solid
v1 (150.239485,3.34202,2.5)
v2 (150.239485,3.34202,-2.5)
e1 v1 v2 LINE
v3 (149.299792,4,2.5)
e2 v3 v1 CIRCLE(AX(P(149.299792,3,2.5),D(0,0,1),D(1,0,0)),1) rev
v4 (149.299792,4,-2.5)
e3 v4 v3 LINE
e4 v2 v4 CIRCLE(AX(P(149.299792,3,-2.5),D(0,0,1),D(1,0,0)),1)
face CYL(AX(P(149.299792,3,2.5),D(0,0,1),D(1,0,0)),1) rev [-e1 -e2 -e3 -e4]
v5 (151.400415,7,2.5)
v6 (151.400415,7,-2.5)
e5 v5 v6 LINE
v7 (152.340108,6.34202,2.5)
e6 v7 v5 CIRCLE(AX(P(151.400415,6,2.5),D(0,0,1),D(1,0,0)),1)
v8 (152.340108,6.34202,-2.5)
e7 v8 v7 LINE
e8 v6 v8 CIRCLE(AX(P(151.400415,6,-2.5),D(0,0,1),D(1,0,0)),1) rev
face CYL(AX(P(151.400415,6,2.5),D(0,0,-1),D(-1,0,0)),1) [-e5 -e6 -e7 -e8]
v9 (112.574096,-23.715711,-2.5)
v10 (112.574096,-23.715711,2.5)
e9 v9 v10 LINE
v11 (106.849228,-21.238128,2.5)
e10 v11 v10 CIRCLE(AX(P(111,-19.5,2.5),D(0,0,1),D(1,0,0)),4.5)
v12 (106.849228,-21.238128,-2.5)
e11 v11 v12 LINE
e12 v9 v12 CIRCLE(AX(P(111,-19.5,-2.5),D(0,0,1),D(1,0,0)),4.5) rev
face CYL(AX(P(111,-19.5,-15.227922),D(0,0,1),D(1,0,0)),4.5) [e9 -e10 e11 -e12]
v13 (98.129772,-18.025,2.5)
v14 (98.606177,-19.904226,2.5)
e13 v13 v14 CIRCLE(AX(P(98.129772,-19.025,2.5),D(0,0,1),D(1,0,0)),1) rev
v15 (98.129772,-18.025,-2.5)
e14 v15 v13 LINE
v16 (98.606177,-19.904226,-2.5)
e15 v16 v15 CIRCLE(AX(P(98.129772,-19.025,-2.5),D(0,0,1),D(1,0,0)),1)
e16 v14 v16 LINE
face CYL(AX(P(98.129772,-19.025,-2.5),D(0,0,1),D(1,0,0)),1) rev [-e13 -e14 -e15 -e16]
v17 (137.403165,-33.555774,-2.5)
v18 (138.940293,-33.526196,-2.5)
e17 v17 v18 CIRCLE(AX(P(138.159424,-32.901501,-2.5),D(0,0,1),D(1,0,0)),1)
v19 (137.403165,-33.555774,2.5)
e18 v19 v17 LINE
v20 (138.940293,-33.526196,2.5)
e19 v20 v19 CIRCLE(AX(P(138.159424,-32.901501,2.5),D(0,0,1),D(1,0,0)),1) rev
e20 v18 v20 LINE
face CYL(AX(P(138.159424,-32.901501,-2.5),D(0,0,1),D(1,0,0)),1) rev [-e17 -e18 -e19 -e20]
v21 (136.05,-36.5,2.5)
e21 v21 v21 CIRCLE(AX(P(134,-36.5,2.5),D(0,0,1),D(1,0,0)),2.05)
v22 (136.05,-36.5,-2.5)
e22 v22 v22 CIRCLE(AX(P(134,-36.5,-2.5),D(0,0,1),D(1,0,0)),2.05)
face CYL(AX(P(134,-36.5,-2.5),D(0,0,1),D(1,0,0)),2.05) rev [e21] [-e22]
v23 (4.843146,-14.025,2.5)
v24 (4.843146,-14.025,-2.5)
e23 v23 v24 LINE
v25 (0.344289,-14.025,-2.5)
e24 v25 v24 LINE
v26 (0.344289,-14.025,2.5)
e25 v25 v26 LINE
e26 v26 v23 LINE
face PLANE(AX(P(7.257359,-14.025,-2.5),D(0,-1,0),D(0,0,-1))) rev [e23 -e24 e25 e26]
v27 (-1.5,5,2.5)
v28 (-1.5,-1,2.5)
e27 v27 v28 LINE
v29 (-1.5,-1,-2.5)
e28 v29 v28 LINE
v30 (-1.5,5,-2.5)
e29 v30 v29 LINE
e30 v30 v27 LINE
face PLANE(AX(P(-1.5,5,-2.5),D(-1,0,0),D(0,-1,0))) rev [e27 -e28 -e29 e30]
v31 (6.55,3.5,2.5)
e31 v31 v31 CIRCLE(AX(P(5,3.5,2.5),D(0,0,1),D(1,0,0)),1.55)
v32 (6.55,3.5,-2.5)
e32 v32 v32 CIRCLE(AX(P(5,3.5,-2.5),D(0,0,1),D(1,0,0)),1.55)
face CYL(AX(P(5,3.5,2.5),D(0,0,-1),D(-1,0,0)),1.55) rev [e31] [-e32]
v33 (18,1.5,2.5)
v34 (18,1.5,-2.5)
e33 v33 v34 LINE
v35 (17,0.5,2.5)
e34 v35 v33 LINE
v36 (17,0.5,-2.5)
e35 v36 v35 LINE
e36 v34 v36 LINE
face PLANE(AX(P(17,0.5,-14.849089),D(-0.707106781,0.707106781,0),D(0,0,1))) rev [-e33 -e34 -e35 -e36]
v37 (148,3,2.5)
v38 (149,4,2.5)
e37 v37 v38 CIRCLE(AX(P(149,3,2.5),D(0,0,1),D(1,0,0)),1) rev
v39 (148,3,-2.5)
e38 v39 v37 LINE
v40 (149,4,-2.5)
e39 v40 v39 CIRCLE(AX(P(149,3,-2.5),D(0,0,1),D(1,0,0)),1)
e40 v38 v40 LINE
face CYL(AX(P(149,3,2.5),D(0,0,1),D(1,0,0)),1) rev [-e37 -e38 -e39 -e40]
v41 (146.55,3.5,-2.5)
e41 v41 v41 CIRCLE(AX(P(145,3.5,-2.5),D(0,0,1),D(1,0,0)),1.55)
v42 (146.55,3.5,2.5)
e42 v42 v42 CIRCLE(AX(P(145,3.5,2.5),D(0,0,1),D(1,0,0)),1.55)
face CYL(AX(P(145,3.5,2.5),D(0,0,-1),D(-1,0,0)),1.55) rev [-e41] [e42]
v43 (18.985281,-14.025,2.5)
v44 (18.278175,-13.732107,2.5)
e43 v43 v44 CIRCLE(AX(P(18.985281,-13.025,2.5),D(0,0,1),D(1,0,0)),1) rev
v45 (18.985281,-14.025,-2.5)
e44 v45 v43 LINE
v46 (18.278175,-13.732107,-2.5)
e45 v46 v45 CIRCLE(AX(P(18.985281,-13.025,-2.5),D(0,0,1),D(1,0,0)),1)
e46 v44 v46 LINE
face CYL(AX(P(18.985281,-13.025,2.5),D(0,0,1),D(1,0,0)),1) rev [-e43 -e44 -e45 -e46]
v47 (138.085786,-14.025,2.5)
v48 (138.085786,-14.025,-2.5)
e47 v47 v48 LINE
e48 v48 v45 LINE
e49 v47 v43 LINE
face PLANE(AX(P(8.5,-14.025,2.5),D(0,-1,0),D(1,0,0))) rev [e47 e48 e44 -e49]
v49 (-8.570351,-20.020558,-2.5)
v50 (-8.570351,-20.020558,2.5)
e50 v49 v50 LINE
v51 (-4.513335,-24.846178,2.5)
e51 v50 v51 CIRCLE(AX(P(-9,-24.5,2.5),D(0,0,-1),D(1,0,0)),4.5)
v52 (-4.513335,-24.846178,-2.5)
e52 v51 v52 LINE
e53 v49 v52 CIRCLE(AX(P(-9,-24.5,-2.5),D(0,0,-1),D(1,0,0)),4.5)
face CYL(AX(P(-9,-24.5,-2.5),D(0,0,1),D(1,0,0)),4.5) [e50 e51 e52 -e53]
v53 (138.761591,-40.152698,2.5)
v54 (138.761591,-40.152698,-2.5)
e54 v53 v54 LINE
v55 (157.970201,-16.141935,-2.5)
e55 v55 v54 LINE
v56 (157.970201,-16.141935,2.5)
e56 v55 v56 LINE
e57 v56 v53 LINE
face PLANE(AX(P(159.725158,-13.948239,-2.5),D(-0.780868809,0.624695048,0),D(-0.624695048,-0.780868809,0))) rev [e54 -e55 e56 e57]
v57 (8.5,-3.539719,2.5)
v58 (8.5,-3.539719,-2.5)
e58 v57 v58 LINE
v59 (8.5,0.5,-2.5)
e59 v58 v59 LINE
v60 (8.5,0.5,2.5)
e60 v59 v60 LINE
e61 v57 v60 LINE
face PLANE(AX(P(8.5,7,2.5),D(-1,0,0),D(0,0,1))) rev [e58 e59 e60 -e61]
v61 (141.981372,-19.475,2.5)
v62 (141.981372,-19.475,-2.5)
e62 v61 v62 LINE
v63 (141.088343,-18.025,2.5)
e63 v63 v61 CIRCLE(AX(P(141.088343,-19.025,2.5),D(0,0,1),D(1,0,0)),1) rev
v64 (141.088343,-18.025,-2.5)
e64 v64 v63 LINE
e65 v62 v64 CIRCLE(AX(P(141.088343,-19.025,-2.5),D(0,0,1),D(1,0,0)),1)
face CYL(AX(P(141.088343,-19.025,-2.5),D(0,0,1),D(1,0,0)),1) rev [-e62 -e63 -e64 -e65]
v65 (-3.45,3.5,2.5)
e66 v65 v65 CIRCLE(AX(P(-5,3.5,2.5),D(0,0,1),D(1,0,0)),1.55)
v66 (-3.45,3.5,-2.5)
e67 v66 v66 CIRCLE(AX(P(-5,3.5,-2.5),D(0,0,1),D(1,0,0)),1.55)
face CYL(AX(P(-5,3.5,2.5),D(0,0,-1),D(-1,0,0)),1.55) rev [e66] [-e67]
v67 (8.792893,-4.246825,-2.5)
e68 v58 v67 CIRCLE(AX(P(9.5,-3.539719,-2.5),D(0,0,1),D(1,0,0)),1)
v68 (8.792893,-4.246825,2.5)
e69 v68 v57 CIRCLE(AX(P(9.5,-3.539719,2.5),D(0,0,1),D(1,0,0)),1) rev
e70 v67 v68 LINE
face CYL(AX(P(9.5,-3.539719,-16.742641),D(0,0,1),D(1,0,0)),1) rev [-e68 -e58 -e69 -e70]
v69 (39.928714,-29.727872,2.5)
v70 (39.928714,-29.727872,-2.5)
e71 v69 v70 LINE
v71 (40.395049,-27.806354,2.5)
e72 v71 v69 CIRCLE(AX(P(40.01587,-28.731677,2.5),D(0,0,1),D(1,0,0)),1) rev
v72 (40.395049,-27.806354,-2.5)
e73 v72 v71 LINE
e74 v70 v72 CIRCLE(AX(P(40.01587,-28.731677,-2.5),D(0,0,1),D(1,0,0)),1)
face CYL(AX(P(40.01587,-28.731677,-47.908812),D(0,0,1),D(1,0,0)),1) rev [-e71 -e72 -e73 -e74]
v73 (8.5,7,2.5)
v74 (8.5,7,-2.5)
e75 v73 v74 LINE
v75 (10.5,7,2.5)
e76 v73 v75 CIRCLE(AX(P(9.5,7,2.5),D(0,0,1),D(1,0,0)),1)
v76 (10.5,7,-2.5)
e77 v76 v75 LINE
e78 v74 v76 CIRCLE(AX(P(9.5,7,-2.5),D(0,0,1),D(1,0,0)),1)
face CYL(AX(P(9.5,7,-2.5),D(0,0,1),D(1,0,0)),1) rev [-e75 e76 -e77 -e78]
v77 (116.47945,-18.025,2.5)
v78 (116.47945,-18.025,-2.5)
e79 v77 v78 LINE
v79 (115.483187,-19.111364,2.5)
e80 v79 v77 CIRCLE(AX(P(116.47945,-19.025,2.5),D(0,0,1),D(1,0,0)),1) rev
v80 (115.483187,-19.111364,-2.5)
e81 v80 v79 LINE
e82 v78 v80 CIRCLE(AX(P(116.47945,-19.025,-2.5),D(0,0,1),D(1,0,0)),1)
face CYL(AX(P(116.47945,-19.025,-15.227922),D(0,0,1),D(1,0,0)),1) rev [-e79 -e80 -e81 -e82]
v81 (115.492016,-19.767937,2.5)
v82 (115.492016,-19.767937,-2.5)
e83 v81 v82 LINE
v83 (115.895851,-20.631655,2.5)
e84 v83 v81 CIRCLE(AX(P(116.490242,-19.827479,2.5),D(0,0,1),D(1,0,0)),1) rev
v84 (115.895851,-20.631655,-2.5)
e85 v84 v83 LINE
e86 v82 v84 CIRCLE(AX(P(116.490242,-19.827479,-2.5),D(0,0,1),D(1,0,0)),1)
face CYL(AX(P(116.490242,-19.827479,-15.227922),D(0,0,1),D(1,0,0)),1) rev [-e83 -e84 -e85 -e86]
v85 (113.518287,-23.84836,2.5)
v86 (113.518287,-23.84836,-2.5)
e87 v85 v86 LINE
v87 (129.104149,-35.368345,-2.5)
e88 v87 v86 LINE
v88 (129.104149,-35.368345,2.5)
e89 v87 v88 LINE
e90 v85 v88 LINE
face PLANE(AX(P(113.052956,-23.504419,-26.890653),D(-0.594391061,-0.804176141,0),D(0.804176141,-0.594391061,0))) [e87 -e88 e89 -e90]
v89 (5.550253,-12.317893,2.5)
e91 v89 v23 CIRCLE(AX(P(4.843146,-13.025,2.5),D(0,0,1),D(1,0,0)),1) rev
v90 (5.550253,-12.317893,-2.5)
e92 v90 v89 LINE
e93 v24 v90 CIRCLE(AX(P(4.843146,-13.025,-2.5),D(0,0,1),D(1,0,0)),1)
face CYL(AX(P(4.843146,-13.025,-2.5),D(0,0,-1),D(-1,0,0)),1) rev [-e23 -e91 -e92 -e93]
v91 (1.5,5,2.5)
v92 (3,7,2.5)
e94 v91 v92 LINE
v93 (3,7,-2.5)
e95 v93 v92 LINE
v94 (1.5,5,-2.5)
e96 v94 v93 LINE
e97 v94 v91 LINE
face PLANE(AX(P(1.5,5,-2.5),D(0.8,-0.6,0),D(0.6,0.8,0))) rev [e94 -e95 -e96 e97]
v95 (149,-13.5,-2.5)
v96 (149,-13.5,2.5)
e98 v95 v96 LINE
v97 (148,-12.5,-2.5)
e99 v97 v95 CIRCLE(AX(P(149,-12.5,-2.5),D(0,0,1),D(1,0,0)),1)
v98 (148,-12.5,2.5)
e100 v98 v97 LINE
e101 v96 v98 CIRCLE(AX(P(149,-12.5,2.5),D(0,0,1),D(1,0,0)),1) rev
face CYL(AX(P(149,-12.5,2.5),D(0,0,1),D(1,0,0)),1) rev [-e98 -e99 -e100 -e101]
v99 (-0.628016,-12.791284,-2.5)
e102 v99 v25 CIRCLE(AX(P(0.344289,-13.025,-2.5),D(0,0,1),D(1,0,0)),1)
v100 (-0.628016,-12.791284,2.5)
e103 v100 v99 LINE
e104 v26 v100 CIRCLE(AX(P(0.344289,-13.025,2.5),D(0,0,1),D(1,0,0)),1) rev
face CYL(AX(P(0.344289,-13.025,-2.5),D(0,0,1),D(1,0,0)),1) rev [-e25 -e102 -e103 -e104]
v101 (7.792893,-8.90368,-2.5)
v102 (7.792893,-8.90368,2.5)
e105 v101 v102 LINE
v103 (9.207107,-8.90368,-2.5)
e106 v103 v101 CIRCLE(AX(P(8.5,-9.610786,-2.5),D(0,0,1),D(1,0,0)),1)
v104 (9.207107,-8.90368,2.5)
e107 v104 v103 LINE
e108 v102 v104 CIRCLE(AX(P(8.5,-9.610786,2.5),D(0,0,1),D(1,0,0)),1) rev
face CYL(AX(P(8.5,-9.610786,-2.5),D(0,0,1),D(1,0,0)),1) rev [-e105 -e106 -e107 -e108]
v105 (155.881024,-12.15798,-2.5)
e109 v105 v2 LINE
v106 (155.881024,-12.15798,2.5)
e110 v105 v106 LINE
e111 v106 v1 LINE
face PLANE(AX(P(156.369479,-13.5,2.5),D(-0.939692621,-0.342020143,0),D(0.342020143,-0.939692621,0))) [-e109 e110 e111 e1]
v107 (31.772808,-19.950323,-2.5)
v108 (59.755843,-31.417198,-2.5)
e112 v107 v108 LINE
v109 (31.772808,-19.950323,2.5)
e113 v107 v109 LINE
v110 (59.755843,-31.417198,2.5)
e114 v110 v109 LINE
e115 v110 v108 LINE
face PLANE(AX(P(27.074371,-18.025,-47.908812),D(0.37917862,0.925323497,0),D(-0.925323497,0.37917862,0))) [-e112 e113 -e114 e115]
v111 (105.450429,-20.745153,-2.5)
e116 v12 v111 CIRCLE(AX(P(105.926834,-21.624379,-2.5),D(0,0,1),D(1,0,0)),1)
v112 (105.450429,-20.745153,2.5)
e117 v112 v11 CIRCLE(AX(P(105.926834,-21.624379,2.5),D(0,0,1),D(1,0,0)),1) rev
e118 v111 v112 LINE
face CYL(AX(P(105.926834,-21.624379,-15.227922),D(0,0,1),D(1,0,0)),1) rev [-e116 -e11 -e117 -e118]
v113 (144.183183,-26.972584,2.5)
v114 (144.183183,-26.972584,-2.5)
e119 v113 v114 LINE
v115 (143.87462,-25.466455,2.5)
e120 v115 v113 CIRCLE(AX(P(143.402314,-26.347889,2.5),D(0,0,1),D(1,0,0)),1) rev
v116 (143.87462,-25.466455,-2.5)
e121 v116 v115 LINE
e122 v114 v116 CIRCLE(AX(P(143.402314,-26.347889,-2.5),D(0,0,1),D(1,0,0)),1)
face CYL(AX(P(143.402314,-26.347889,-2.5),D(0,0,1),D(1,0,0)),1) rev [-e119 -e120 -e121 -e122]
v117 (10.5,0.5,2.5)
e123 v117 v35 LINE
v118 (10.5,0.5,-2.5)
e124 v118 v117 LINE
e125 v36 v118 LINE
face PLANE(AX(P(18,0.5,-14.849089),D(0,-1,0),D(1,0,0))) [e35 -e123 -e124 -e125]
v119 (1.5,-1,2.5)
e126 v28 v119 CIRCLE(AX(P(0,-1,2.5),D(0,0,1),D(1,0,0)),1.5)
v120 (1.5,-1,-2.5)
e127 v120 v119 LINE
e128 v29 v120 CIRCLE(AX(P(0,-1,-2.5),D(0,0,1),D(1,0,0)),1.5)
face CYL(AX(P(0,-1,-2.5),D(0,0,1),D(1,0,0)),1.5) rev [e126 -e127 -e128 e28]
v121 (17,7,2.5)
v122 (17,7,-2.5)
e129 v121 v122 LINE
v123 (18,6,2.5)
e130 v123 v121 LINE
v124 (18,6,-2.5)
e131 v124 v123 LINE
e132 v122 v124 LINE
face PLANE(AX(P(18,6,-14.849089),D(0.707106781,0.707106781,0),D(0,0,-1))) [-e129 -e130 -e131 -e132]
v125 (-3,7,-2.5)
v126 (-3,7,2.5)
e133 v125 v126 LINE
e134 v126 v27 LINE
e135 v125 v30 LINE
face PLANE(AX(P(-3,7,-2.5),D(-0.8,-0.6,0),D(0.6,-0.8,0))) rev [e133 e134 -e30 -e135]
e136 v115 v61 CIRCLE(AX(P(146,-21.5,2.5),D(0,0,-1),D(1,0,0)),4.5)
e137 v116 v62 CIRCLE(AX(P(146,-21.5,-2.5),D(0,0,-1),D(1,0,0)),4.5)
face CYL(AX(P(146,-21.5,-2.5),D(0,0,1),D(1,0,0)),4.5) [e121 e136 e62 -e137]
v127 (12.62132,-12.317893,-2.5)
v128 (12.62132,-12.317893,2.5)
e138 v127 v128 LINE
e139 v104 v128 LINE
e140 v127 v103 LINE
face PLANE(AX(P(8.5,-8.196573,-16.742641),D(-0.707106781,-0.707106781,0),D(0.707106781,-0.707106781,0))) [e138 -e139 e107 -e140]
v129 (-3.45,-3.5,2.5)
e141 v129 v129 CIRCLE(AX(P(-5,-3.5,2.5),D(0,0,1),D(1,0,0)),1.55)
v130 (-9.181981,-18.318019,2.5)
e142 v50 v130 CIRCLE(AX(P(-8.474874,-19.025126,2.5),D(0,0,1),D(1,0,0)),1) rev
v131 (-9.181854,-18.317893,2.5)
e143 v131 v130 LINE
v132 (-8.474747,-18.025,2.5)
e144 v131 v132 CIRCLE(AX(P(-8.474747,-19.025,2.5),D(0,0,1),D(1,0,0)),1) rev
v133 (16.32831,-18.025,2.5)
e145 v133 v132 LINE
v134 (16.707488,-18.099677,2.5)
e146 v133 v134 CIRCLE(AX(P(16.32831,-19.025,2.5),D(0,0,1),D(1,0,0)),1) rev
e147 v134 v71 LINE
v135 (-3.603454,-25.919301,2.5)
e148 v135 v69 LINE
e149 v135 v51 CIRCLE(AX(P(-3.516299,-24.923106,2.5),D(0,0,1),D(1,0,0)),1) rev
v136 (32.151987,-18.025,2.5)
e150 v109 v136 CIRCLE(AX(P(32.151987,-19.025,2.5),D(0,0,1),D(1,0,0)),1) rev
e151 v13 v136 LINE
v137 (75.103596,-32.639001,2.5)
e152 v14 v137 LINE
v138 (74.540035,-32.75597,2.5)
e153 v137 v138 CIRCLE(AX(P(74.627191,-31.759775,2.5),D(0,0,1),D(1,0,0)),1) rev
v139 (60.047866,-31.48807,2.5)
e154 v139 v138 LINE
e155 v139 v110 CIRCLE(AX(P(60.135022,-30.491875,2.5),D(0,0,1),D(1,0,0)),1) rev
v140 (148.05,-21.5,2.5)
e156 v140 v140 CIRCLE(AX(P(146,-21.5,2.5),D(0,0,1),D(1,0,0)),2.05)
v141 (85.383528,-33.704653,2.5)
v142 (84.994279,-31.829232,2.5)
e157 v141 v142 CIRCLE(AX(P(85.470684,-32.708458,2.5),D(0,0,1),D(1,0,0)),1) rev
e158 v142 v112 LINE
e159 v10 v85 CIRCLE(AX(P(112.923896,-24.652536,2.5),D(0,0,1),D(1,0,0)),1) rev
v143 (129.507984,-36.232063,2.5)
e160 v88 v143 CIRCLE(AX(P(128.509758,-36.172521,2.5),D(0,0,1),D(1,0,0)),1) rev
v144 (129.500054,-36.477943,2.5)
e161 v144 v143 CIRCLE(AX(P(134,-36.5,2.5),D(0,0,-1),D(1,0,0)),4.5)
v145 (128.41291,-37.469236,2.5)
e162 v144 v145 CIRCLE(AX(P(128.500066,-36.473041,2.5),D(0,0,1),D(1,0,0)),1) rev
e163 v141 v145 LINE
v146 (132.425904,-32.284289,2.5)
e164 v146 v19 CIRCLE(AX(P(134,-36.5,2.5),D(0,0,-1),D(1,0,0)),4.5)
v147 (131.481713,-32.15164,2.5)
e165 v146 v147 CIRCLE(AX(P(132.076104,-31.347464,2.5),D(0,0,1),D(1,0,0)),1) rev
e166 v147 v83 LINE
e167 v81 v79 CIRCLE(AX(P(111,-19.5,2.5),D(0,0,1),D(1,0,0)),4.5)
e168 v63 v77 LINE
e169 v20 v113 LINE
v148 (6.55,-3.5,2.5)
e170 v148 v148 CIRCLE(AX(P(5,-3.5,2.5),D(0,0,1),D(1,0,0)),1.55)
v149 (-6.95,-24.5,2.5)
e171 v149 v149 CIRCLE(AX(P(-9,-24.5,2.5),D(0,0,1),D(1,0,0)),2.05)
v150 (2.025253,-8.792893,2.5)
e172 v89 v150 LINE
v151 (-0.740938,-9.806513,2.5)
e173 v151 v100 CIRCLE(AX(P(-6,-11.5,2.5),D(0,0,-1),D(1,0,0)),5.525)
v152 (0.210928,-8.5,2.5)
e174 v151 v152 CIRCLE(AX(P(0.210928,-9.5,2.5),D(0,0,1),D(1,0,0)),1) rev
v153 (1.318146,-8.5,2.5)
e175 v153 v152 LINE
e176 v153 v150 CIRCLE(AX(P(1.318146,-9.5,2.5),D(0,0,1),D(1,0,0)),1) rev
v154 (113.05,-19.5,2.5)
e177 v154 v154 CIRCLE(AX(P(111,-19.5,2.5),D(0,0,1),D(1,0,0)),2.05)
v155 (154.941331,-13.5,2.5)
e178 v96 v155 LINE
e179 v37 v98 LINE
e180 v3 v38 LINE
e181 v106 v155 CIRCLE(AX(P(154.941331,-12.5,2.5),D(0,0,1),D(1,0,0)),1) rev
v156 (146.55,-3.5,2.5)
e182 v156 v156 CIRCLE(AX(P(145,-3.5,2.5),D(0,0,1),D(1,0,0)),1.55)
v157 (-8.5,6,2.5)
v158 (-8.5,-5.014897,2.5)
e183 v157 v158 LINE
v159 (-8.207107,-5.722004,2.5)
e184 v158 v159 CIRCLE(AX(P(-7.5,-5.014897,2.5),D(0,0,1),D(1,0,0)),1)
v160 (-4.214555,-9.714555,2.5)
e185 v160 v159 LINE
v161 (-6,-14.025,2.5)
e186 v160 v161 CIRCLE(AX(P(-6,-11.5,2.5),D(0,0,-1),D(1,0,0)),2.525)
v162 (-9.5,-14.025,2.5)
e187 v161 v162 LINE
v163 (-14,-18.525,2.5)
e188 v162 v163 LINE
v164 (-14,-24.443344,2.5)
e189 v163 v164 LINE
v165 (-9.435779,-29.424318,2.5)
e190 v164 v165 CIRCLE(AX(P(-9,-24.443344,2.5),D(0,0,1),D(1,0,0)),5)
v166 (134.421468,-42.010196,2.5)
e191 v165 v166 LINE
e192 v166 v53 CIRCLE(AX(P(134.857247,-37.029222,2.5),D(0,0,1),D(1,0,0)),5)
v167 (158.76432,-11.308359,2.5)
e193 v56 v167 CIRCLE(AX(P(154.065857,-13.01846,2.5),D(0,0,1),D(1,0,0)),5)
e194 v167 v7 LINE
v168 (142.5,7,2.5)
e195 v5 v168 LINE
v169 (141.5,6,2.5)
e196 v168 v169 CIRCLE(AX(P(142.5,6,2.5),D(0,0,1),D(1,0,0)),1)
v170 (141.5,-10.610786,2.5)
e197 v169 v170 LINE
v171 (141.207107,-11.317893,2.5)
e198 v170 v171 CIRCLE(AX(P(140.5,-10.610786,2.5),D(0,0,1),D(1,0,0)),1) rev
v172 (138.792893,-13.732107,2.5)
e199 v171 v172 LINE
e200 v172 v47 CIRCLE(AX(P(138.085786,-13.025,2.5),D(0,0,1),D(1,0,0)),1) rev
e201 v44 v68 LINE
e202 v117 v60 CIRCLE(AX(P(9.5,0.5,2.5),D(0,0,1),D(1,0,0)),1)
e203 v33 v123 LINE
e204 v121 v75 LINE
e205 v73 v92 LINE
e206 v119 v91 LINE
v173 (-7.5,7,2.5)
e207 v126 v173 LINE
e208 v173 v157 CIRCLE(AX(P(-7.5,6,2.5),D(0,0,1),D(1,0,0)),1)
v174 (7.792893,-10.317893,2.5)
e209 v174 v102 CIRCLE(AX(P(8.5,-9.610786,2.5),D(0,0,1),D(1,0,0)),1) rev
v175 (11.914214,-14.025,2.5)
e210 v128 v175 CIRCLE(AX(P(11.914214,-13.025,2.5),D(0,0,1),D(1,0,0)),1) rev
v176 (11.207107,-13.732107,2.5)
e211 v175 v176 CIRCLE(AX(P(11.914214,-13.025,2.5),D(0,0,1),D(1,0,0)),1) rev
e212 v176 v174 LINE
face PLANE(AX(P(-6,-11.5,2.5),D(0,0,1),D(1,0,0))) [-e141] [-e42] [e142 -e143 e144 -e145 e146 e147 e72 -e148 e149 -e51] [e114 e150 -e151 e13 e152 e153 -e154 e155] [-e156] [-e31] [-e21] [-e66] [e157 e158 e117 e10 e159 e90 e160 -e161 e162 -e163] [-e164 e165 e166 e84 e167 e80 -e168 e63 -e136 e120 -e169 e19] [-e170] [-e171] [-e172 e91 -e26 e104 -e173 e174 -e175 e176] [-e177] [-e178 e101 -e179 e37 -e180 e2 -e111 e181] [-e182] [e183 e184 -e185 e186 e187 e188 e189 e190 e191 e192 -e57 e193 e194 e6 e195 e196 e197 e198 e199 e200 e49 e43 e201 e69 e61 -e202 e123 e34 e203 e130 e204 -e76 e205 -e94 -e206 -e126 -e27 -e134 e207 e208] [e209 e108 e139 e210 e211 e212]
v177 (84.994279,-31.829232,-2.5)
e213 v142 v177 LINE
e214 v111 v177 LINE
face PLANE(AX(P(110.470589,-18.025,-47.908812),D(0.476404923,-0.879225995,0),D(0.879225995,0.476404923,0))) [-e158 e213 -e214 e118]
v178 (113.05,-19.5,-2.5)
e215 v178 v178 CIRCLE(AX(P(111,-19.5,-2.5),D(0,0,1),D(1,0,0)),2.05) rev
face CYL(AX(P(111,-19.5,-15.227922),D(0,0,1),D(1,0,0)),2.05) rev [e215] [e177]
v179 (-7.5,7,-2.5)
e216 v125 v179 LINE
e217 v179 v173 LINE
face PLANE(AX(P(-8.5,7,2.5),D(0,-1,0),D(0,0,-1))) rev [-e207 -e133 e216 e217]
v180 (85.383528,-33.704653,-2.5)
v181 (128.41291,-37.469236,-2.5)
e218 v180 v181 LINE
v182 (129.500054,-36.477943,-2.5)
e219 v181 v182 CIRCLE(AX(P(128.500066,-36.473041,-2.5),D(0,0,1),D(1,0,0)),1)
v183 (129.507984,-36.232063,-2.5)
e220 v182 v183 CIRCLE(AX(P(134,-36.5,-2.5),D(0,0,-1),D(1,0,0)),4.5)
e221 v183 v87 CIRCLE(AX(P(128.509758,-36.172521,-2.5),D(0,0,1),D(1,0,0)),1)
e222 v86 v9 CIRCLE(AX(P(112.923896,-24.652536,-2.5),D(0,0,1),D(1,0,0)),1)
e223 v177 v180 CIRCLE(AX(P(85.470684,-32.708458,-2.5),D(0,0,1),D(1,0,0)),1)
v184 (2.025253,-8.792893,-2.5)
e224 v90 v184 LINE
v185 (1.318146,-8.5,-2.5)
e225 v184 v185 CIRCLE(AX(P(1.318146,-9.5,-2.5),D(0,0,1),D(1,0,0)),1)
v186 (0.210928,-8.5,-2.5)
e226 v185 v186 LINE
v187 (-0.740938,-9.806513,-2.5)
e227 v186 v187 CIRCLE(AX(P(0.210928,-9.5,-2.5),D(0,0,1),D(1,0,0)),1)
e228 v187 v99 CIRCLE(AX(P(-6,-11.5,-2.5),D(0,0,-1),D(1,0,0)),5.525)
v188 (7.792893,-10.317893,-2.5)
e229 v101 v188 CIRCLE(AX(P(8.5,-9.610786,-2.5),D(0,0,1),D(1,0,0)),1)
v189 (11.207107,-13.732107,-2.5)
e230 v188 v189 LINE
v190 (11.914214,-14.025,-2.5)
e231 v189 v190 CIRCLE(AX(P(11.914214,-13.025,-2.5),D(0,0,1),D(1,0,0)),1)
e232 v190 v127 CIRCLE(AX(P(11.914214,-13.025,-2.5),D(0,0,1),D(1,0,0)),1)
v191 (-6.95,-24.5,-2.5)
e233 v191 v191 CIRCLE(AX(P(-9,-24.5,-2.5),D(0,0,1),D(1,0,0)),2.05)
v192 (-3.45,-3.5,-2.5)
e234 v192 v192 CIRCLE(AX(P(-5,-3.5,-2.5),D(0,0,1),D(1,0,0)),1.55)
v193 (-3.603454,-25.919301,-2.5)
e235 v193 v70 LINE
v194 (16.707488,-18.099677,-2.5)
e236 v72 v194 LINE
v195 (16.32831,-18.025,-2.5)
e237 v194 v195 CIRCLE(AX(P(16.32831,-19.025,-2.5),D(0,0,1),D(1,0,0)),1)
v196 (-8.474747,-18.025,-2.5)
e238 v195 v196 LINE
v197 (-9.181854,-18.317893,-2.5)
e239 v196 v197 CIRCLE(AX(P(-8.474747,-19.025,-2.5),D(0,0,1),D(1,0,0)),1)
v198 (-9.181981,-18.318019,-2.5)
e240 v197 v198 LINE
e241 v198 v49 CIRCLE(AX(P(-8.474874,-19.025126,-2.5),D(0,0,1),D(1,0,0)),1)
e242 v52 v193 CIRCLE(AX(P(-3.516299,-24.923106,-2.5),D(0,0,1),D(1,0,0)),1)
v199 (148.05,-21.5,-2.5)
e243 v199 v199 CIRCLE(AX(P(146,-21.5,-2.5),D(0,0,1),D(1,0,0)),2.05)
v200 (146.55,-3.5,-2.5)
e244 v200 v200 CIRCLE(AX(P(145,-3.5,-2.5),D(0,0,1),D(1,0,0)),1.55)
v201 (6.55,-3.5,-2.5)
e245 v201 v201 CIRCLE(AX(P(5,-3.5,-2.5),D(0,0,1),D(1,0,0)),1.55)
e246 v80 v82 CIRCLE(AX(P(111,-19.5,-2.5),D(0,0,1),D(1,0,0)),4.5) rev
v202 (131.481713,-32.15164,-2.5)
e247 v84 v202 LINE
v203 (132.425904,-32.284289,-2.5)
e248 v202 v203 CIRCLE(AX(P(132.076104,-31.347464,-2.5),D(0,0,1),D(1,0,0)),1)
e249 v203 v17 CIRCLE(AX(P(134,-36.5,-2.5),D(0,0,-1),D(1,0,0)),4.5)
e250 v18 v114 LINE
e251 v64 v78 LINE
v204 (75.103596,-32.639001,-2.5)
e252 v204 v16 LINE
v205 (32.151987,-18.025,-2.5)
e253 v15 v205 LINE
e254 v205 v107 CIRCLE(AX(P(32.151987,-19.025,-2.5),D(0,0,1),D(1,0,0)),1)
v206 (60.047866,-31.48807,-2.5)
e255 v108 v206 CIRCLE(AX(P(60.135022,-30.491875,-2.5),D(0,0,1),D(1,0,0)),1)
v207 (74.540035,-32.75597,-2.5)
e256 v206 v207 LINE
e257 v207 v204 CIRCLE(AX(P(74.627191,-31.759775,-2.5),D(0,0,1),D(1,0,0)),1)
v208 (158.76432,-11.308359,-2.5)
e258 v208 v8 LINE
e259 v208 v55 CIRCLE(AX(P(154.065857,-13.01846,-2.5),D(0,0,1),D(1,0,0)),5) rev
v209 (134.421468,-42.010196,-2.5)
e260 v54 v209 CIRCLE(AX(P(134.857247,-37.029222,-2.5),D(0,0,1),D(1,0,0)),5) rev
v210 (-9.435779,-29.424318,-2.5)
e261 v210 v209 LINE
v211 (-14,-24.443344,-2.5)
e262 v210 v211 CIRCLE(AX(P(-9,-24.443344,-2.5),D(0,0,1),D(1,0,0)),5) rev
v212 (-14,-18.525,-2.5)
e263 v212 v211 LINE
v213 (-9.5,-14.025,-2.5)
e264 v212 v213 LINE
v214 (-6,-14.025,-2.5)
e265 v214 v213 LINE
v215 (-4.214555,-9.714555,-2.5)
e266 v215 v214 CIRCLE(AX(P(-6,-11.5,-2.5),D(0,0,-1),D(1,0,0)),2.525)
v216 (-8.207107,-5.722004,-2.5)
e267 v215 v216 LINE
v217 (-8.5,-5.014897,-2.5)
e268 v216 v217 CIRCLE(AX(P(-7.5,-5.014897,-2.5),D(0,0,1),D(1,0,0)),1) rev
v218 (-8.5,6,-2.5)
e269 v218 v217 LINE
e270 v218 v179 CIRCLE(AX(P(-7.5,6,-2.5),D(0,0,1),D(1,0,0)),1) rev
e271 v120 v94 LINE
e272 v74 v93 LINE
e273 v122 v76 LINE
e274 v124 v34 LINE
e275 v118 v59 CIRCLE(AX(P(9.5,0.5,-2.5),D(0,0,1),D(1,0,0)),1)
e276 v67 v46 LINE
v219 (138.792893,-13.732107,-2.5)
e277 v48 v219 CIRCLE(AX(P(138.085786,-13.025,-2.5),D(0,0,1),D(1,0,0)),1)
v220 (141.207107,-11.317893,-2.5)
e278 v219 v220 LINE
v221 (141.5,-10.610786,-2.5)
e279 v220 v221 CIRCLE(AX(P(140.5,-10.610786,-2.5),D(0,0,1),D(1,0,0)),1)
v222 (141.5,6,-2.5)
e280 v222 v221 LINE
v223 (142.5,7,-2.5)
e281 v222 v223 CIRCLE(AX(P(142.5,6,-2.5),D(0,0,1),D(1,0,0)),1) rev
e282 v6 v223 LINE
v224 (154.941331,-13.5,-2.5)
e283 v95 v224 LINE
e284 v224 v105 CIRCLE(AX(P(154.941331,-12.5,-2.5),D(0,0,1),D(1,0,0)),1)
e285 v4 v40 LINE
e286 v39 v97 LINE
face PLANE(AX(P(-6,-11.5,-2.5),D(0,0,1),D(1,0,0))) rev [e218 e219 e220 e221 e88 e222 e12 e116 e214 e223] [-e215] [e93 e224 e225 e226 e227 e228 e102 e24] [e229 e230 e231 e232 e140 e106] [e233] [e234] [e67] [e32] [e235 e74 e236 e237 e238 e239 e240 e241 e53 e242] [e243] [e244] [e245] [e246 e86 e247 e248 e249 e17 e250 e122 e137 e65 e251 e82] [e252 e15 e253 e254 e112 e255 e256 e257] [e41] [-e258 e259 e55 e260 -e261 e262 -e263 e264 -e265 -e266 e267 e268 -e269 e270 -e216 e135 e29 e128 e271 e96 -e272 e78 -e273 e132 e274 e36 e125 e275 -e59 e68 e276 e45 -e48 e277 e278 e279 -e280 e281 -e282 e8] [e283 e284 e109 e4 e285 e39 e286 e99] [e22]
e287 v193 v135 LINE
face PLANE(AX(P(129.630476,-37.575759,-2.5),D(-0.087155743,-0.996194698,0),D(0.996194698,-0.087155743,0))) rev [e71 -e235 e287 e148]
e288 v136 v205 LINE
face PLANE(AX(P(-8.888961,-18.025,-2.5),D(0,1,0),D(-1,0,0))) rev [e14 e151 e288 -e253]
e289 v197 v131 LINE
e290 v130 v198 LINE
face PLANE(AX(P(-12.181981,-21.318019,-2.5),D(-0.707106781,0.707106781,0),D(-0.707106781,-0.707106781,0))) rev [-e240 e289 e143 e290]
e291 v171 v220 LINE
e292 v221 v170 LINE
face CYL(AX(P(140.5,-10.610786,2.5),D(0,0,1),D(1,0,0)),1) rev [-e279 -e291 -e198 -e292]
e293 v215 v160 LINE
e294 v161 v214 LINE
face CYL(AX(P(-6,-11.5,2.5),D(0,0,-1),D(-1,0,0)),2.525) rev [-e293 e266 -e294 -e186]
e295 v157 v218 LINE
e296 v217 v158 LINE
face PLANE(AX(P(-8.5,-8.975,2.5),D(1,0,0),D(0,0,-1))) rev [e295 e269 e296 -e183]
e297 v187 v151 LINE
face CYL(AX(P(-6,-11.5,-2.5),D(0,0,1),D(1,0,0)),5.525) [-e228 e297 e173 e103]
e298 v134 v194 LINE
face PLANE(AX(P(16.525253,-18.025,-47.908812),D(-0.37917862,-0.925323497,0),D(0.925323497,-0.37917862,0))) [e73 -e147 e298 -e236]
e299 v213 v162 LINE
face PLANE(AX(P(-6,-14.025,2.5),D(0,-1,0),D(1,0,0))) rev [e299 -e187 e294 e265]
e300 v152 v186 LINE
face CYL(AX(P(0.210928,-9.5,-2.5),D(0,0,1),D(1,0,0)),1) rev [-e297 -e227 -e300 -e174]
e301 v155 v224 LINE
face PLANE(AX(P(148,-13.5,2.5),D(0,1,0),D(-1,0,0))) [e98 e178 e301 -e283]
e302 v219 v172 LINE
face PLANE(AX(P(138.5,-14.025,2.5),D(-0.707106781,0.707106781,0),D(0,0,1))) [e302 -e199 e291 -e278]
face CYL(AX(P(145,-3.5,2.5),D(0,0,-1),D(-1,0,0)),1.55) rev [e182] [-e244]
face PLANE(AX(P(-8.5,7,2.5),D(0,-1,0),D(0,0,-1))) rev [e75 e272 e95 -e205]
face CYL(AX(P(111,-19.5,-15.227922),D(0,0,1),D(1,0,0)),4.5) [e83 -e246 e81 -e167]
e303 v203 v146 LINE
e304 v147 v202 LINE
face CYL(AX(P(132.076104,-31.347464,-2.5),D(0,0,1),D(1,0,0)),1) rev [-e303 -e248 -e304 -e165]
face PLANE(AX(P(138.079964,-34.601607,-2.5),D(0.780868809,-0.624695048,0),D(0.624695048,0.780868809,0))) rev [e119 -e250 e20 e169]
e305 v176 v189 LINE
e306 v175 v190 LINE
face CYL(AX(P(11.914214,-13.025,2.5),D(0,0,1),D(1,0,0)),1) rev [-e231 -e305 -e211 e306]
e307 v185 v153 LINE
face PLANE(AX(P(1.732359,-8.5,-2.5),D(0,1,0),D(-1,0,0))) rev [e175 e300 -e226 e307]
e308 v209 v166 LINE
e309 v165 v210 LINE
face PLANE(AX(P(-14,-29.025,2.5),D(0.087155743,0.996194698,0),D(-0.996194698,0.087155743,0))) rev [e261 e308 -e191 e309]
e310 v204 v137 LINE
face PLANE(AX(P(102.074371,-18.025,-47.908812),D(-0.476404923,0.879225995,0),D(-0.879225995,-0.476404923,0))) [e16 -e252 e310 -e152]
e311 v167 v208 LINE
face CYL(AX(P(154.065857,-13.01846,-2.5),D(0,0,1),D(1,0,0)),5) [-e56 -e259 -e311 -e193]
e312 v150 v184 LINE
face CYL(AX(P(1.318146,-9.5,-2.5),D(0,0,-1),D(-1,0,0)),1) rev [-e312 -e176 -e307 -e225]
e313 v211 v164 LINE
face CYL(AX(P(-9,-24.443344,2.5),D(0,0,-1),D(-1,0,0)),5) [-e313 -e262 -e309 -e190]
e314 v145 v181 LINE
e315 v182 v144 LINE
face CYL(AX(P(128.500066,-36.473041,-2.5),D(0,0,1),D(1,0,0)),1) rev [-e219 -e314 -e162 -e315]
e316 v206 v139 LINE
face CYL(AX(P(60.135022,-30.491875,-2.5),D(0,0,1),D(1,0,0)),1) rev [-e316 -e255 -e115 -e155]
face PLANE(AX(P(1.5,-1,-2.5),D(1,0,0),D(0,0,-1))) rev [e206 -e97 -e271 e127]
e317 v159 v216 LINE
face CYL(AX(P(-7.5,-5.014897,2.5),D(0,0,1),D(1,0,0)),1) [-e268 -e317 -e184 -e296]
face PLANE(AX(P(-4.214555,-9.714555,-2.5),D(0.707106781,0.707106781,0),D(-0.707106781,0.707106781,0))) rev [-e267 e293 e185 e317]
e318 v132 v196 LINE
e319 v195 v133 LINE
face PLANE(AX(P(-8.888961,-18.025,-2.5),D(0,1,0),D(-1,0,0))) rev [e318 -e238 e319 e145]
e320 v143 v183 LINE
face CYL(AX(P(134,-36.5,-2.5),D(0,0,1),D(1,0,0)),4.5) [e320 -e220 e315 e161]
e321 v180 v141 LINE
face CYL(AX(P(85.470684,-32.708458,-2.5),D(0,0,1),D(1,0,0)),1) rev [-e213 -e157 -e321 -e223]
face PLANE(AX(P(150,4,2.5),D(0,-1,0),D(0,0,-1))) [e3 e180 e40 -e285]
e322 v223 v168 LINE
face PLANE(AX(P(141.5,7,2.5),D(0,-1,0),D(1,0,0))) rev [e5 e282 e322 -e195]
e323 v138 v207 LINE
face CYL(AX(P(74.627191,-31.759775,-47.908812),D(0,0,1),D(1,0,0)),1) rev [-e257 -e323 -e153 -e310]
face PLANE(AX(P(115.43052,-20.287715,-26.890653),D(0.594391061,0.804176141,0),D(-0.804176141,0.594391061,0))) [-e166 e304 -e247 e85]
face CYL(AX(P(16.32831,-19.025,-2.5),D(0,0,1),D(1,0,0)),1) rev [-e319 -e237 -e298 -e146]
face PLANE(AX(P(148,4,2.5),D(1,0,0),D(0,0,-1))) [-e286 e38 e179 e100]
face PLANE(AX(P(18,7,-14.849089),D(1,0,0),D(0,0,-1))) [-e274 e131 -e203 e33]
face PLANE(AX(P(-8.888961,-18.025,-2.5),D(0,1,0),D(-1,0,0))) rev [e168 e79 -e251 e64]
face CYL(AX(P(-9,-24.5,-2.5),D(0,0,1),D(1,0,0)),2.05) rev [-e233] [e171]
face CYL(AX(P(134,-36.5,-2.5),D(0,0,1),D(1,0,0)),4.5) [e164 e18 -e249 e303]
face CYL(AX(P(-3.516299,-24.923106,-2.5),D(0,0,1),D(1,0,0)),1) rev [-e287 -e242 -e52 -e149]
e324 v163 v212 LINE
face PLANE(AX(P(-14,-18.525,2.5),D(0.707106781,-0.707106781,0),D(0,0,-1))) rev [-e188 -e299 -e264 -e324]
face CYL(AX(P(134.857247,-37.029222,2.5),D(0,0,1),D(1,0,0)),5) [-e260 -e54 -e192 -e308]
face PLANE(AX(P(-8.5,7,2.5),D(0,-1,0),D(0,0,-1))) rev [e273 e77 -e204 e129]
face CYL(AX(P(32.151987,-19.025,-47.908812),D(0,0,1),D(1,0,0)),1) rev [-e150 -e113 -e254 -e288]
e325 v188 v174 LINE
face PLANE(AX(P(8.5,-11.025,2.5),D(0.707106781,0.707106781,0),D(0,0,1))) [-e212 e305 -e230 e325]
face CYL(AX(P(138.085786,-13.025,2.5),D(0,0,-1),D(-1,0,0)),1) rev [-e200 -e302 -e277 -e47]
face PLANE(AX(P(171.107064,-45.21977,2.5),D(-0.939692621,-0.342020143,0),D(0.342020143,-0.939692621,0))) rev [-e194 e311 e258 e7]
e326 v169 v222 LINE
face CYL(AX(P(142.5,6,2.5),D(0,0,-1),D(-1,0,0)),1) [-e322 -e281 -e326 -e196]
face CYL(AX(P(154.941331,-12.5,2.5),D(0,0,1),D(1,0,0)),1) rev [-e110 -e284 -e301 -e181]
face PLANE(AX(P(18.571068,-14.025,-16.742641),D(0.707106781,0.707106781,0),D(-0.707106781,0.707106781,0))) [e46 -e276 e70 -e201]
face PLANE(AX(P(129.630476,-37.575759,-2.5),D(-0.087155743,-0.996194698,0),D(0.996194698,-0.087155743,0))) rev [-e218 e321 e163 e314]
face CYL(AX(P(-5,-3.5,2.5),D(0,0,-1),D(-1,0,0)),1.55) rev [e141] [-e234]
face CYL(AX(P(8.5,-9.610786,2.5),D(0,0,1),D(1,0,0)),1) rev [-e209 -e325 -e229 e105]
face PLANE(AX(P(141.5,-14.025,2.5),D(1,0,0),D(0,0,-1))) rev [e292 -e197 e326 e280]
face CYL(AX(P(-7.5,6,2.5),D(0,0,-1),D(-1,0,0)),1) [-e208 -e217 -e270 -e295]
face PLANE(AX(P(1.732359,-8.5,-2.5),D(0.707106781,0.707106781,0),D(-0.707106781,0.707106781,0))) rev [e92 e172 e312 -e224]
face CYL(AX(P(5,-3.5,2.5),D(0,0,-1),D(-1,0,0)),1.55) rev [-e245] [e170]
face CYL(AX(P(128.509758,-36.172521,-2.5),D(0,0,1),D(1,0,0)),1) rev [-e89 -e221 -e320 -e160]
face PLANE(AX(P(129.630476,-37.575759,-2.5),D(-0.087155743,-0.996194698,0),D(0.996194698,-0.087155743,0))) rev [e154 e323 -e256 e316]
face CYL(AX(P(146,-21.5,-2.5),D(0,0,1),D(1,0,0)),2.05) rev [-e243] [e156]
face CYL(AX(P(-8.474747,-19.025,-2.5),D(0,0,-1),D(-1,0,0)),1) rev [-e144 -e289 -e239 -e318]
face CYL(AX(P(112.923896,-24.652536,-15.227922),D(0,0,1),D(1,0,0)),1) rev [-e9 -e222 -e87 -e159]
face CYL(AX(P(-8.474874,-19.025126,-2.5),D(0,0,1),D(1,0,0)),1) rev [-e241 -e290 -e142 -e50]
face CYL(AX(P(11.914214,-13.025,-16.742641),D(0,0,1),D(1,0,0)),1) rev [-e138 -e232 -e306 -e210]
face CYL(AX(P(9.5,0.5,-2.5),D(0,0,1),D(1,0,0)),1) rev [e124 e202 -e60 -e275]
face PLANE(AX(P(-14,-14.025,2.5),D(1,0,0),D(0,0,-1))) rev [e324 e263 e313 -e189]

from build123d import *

# Parameters (mm, degrees)
SKETCH_1_R           = 1.55
EXTRUDE_1_DEPTH      = 2.5
FILLET_1_R           = 1
CHAMFER_1_SIZE       = 3
SKETCH_3_R           = 2.05
CUT_EXTRUDE_1_DEPTH  = 178.05212527
CUT_EXTRUDE_2_DEPTH  = 178.05212527
CUT_EXTRUDE_3_DEPTH  = 166.292604008
FILLET_2_R           = 1
CHAMFER_2_SIZE       = 4.5
FILLET_4_R           = 5
EXTRUDE_3_DEPTH      = 5
FILLET_5_R           = 1
FILLET_7_R           = 1
CUT_EXTRUDE_4_DEPTH  = 165.600736622
FILLET_8_R           = 1
CUT_EXTRUDE_5_DEPTH  = 165.600736622
EXTRUDE_5_DEPTH      = 5
CUT_EXTRUDE_6_DEPTH  = 165.600736622
FILLET_9_R           = 1
CUT_EXTRUDE_7_DEPTH  = 165.600736622
SKETCH_13_R          = 4.5
SKETCH_13_R_2        = 2.05
EXTRUDE_6_DEPTH      = 5
FILLET_10_R          = 1
EXTRUDE_7_DEPTH      = 5
FILLET_11_R          = 1
EXTRUDE_8_DEPTH      = 5
SKETCH_17_R          = 1
CUT_EXTRUDE_9_DEPTH  = 165.600736622
CHAMFER_3_SIZE       = 1
SKETCH_18_R          = 2.05
CUT_EXTRUDE_10_DEPTH = 165.600736622


with BuildPart() as part:
    # 草图1 → 凸台-拉伸1 (new, symmetric)
    with BuildSketch(Plane.XY):
        with BuildLine():
            Line((-6, -14.025), (-14, -14.025))
            Line((-14, -14.025), (-14, -29.025))
            Line((-14, -29.025), (171.107064417, -45.219769675))
            Line((171.107064417, -45.219769675), (152.100622615, 7))
            Line((152.100622615, 7), (141.5, 7))
            Line((141.5, 7), (141.5, -14.025))
            Line((141.5, -14.025), (8.5, -14.025))
            Line((8.5, -14.025), (8.5, 7))
            Line((8.5, 7), (-8.5, 7))
            Line((-8.5, 7), (-8.5, -8.975))
            Line((-8.5, -8.975), (-6, -8.975))
            ThreePointArc((-6, -8.975), (-3.475, -11.5), (-6, -14.025))
        make_face()
        with Locations((-5, 3.5)):
            Circle(SKETCH_1_R, mode=Mode.SUBTRACT)
        with Locations((5, 3.5)):
            Circle(SKETCH_1_R, mode=Mode.SUBTRACT)
        with Locations((-5, -3.5)):
            Circle(SKETCH_1_R, mode=Mode.SUBTRACT)
        with Locations((5, -3.5)):
            Circle(SKETCH_1_R, mode=Mode.SUBTRACT)
        with Locations((145, 3.5)):
            Circle(SKETCH_1_R, mode=Mode.SUBTRACT)
        with Locations((145, -3.5)):
            Circle(SKETCH_1_R, mode=Mode.SUBTRACT)
        Polygon((148, 4), (148, -13.5), (156.3694791, -13.5), (150, 4), align=None, mode=Mode.SUBTRACT)
    extrude(amount=EXTRUDE_1_DEPTH, both=True)

    # 圆角1
    fillet_1_edges = [part.edges().sort_by_distance(p)[0] for p in [
        (141.5, 7, 0),
        (152.100622615, 7, 0),
        (156.3694791, -13.5, 0),
        (150, 4, 0),
        (148, 4, 0),
        (148, -13.5, 0),
    ]]
    fillet(fillet_1_edges, radius=FILLET_1_R)

    # 倒角1
    chamfer_1_edges = [part.edges().sort_by_distance(p)[0] for p in [
        (8.5, -14.025, 0),
        (141.5, -14.025, 0),
    ]]
    chamfer(chamfer_1_edges, length=CHAMFER_1_SIZE)

    # 草图3 → 切除-拉伸1 (cut, through all)
    with BuildSketch(Plane.XY.offset(2.5)):
        with Locations((-9, -24.5)):
            Circle(SKETCH_3_R)
        with Locations((146, -21.5)):
            Circle(SKETCH_3_R)
        with Locations((134, -36.5)):
            Circle(SKETCH_3_R)
    extrude(amount=-CUT_EXTRUDE_1_DEPTH, mode=Mode.SUBTRACT)

    # 草图4 → 切除-拉伸2 (cut, through all)
    with BuildSketch(Plane.XY.offset(2.5)):
        Polygon((159.725158013, -13.94823884), (137.088896577, -42.243565635), (171.107064417, -45.219769675), align=None)
    extrude(amount=-CUT_EXTRUDE_2_DEPTH, mode=Mode.SUBTRACT)

    # 草图5 → 切除-拉伸3 (cut, through all)
    with BuildSketch(Plane.XY.offset(2.5)):
        with BuildLine():
            Line((-12.181980515, -21.318019485), (-8.888961031, -18.025))
            Line((-8.888961031, -18.025), (143.140913607, -18.025))
            ThreePointArc((143.140913607, -18.025), (141.625936704, -22.557151967), (145.043511375, -25.8971729))
            Line((145.043511375, -25.8971729), (138.079963863, -34.60160729))
            ThreePointArc((138.079963863, -34.60160729), (132.505892934, -32.255280448), (129.630475707, -37.575759011))
            Line((129.630475707, -37.575759011), (-4.699014499, -25.823451441))
            ThreePointArc((-4.699014499, -25.823451441), (-6.678842462, -20.644844013), (-12.181980515, -21.318019485))
        make_face()
    extrude(amount=-CUT_EXTRUDE_3_DEPTH, mode=Mode.SUBTRACT)

    # 圆角2
    fillet_2_edges = [part.edges().sort_by_distance(p)[0] for p in [
        (-4.699014499, -25.823451441, 0),
        (-8.888961031, -18.025, 0),
        (143.140913607, -18.025, 0),
        (145.043511375, -25.8971729, 0),
        (138.079963863, -34.60160729, 0),
        (129.630475707, -37.575759011, 0),
    ]]
    fillet(fillet_2_edges, radius=FILLET_2_R)
    fillet_2_2_edges = [part.edges().sort_by_distance(p)[0] for p in [
        (-12.181980515, -21.318019485, 0),
    ]]
    fillet(fillet_2_2_edges, radius=FILLET_2_R)

    # 倒角2
    chamfer_2_edges = [part.edges().sort_by_distance(p)[0] for p in [
        (-14, -14.025, 0),
    ]]
    chamfer(chamfer_2_edges, length=CHAMFER_2_SIZE)

    # 圆角4
    fillet_4_edges = [part.edges().sort_by_distance(p)[0] for p in [
        (159.725158013, -13.94823884, 0),
        (137.088896577, -42.243565635, 0),
        (-14, -29.025, 0),
    ]]
    fillet(fillet_4_edges, radius=FILLET_4_R)

    # 草图7 → 凸台-拉伸3 (add)
    with BuildSketch(Plane.XY.offset(2.5)):
        Polygon((16.525252532, -18.025), (46.483701437, -30.301358854), (59.896469489, -31.474824005), (27.074370524, -18.025), align=None)
        Polygon((102.074370524, -18.025), (74.83938996, -32.782160146), (82.068385362, -33.414615292), (110.470589391, -18.025), align=None)
    extrude(amount=-EXTRUDE_3_DEPTH)

    # 圆角5
    fillet_5_edges = [part.edges().sort_by_distance(p)[0] for p in [
        (16.525252532, -18.025, 0),
        (27.074370524, -18.025, 0),
        (59.896469489, -31.474824005, 0),
        (46.483701437, -30.301358854, 0),
        (102.074370524, -18.025, 0),
        (110.470589391, -18.025, 0),
        (82.068385362, -33.414615292, 0),
        (74.83938996, -32.782160146, 0),
    ]]
    fillet(fillet_5_edges, radius=FILLET_5_R)

    # 圆角7
    fillet_7_edges = [part.edges().sort_by_distance(p)[0] for p in [
        (-8.5, 7, 0),
        (8.5, 7, 0),
    ]]
    fillet(fillet_7_edges, radius=FILLET_7_R)

    # 草图8 → 切除-拉伸4 (cut, through all)
    with BuildSketch(Plane.XY.offset(2.5)):
        with BuildLine():
            Line((1.732359313, -8.5), (7.257359313, -14.025))
            Line((7.257359313, -14.025), (-1.08573505, -14.025))
            ThreePointArc((-1.08573505, -14.025), (-0.481816001, -11.225645569), (-1.36042836, -8.5))
            Line((-1.36042836, -8.5), (1.732359313, -8.5))
        make_face()
    extrude(amount=-CUT_EXTRUDE_4_DEPTH, mode=Mode.SUBTRACT)

    # 圆角8
    fillet_8_edges = [part.edges().sort_by_distance(p)[0] for p in [
        (-1.36042836, -8.5, 0),
        (1.732359313, -8.5, 0),
        (7.257359313, -14.025, 0),
        (-1.08573505, -14.025, 0),
    ]]
    fillet(fillet_8_edges, radius=FILLET_8_R)

    # 草图9 → 切除-拉伸5 (cut, through all)
    with BuildSketch(Plane.XY.offset(2.5)):
        Polygon((8.5, -11.025), (7.085786438, -9.610786438), (8.5, -8.196572875), align=None)
    extrude(amount=-CUT_EXTRUDE_5_DEPTH, mode=Mode.SUBTRACT)

    # 草图10 → 凸台-拉伸5 (add)
    with BuildSketch(Plane.XY.offset(2.5)):
        Polygon((8.5, -8.196572875), (14.328427125, -14.025), (18.571067812, -14.025), (8.5, -3.953932188), align=None)
    extrude(amount=-EXTRUDE_5_DEPTH)

    # 草图11 → 切除-拉伸6 (cut, through all)
    with BuildSketch(Plane.XY.offset(2.5)):
        with BuildLine():
            Line((-4.214555378, -9.714555378), (-8.5, -5.429110755))
            Line((-8.5, -5.429110755), (-8.5, -8.975))
            Line((-8.5, -8.975), (-6, -8.975))
            ThreePointArc((-6, -8.975), (-5.033724333, -9.16720418), (-4.214555378, -9.714555378))
        make_face()
    extrude(amount=-CUT_EXTRUDE_6_DEPTH, mode=Mode.SUBTRACT)

    # 圆角9
    fillet_9_edges = [part.edges().sort_by_distance(p)[0] for p in [
        (8.5, -3.953932188, 0),
        (18.571067812, -14.025, 0),
        (14.328427125, -14.025, 0),
        (11.5, -14.025, 0),
        (138.5, -14.025, 0),
        (7.085786438, -9.610786438, 0),
        (8.5, -8.196572875, 0),
        (-8.5, -5.429110755, 0),
        (141.5, -11.025, 0),
    ]]
    fillet(fillet_9_edges, radius=FILLET_9_R - 0.0001)  # a hair under: the kernel refuses the full size

    # 草图12 → 切除-拉伸7 (cut, through all)
    with BuildSketch(Plane.XY.offset(2.5)):
        with BuildLine():
            Line((-3, 7), (-1.5, 5))
            Line((-1.5, 5), (-1.5, -1))
            ThreePointArc((-1.5, -1), (0, -2.5), (1.5, -1))
            Line((1.5, -1), (1.5, 5))
            Line((1.5, 5), (3, 7))
            Line((3, 7), (-3, 7))
        make_face()
    extrude(amount=-CUT_EXTRUDE_7_DEPTH, mode=Mode.SUBTRACT)

    # 草图13 → 凸台-拉伸6 (add)
    with BuildSketch(Plane.XY.offset(2.5)):
        with Locations((111, -19.5)):
            Circle(SKETCH_13_R)
        with Locations((111, -19.5)):
            Circle(SKETCH_13_R_2, mode=Mode.SUBTRACT)
    extrude(amount=-EXTRUDE_6_DEPTH)

    # 圆角10
    fillet_10_edges = [part.edges().sort_by_distance(p)[0] for p in [
        (106.547310536, -20.150812215, 0),
    ]]
    fillet(fillet_10_edges, radius=FILLET_10_R)

    # 草图15 → 凸台-拉伸7 (add)
    with BuildSketch(Plane.XY.offset(2.5)):
        with BuildLine():
            Line((113.052955542, -23.504419252), (129.569480214, -35.712285314))
            ThreePointArc((129.569480214, -35.712285314), (130.381207363, -33.825240225), (131.947044458, -32.495580748))
            Line((131.947044458, -32.495580748), (115.430519786, -20.287714686))
            ThreePointArc((115.430519786, -20.287714686), (114.618792637, -22.174759775), (113.052955542, -23.504419252))
        make_face()
    extrude(amount=-EXTRUDE_7_DEPTH)

    # 圆角11
    fillet_11_edges = [part.edges().sort_by_distance(p)[0] for p in [
        (115.251396829, -18.025, 0),
        (113.052955542, -23.504419252, 0),
        (115.430519786, -20.287714686, 0),
        (131.947044458, -32.495580748, 0),
        (129.569480214, -35.712285314, 0),
    ]]
    fillet(fillet_11_edges, radius=FILLET_11_R)

    # 草图16 → 凸台-拉伸8 (add)
    with BuildSketch(Plane.XY.offset(2.5)):
        with BuildLine():
            Line((7.5, 7), (18, 7))
            Line((18, 7), (18, 0.5))
            Line((18, 0.5), (8.5, 0.5))
            Line((8.5, 0.5), (8.5, 6))
            ThreePointArc((8.5, 6), (8.207106781, 6.707106781), (7.5, 7))
        make_face()
    extrude(amount=-EXTRUDE_8_DEPTH)

    # 草图17 → 切除-拉伸9 (cut, through all)
    with BuildSketch(Plane.XY.offset(2.5)):
        with Locations((9.5, 0.5)):
            Circle(SKETCH_17_R)
        with Locations((9.5, 7)):
            Circle(SKETCH_17_R)
    extrude(amount=-CUT_EXTRUDE_9_DEPTH, mode=Mode.SUBTRACT)

    # 倒角3
    chamfer_3_edges = [part.edges().sort_by_distance(p)[0] for p in [
        (18, 7, 0),
        (18, 0.5, 0),
    ]]
    chamfer(chamfer_3_edges, length=CHAMFER_3_SIZE)

    # 草图18 → 切除-拉伸10 (cut, through all)
    with BuildSketch(Plane.XY.offset(2.5)):
        with Locations((111, -19.5)):
            Circle(SKETCH_18_R)
    extrude(amount=-CUT_EXTRUDE_10_DEPTH, mode=Mode.SUBTRACT)


solid = part.part
